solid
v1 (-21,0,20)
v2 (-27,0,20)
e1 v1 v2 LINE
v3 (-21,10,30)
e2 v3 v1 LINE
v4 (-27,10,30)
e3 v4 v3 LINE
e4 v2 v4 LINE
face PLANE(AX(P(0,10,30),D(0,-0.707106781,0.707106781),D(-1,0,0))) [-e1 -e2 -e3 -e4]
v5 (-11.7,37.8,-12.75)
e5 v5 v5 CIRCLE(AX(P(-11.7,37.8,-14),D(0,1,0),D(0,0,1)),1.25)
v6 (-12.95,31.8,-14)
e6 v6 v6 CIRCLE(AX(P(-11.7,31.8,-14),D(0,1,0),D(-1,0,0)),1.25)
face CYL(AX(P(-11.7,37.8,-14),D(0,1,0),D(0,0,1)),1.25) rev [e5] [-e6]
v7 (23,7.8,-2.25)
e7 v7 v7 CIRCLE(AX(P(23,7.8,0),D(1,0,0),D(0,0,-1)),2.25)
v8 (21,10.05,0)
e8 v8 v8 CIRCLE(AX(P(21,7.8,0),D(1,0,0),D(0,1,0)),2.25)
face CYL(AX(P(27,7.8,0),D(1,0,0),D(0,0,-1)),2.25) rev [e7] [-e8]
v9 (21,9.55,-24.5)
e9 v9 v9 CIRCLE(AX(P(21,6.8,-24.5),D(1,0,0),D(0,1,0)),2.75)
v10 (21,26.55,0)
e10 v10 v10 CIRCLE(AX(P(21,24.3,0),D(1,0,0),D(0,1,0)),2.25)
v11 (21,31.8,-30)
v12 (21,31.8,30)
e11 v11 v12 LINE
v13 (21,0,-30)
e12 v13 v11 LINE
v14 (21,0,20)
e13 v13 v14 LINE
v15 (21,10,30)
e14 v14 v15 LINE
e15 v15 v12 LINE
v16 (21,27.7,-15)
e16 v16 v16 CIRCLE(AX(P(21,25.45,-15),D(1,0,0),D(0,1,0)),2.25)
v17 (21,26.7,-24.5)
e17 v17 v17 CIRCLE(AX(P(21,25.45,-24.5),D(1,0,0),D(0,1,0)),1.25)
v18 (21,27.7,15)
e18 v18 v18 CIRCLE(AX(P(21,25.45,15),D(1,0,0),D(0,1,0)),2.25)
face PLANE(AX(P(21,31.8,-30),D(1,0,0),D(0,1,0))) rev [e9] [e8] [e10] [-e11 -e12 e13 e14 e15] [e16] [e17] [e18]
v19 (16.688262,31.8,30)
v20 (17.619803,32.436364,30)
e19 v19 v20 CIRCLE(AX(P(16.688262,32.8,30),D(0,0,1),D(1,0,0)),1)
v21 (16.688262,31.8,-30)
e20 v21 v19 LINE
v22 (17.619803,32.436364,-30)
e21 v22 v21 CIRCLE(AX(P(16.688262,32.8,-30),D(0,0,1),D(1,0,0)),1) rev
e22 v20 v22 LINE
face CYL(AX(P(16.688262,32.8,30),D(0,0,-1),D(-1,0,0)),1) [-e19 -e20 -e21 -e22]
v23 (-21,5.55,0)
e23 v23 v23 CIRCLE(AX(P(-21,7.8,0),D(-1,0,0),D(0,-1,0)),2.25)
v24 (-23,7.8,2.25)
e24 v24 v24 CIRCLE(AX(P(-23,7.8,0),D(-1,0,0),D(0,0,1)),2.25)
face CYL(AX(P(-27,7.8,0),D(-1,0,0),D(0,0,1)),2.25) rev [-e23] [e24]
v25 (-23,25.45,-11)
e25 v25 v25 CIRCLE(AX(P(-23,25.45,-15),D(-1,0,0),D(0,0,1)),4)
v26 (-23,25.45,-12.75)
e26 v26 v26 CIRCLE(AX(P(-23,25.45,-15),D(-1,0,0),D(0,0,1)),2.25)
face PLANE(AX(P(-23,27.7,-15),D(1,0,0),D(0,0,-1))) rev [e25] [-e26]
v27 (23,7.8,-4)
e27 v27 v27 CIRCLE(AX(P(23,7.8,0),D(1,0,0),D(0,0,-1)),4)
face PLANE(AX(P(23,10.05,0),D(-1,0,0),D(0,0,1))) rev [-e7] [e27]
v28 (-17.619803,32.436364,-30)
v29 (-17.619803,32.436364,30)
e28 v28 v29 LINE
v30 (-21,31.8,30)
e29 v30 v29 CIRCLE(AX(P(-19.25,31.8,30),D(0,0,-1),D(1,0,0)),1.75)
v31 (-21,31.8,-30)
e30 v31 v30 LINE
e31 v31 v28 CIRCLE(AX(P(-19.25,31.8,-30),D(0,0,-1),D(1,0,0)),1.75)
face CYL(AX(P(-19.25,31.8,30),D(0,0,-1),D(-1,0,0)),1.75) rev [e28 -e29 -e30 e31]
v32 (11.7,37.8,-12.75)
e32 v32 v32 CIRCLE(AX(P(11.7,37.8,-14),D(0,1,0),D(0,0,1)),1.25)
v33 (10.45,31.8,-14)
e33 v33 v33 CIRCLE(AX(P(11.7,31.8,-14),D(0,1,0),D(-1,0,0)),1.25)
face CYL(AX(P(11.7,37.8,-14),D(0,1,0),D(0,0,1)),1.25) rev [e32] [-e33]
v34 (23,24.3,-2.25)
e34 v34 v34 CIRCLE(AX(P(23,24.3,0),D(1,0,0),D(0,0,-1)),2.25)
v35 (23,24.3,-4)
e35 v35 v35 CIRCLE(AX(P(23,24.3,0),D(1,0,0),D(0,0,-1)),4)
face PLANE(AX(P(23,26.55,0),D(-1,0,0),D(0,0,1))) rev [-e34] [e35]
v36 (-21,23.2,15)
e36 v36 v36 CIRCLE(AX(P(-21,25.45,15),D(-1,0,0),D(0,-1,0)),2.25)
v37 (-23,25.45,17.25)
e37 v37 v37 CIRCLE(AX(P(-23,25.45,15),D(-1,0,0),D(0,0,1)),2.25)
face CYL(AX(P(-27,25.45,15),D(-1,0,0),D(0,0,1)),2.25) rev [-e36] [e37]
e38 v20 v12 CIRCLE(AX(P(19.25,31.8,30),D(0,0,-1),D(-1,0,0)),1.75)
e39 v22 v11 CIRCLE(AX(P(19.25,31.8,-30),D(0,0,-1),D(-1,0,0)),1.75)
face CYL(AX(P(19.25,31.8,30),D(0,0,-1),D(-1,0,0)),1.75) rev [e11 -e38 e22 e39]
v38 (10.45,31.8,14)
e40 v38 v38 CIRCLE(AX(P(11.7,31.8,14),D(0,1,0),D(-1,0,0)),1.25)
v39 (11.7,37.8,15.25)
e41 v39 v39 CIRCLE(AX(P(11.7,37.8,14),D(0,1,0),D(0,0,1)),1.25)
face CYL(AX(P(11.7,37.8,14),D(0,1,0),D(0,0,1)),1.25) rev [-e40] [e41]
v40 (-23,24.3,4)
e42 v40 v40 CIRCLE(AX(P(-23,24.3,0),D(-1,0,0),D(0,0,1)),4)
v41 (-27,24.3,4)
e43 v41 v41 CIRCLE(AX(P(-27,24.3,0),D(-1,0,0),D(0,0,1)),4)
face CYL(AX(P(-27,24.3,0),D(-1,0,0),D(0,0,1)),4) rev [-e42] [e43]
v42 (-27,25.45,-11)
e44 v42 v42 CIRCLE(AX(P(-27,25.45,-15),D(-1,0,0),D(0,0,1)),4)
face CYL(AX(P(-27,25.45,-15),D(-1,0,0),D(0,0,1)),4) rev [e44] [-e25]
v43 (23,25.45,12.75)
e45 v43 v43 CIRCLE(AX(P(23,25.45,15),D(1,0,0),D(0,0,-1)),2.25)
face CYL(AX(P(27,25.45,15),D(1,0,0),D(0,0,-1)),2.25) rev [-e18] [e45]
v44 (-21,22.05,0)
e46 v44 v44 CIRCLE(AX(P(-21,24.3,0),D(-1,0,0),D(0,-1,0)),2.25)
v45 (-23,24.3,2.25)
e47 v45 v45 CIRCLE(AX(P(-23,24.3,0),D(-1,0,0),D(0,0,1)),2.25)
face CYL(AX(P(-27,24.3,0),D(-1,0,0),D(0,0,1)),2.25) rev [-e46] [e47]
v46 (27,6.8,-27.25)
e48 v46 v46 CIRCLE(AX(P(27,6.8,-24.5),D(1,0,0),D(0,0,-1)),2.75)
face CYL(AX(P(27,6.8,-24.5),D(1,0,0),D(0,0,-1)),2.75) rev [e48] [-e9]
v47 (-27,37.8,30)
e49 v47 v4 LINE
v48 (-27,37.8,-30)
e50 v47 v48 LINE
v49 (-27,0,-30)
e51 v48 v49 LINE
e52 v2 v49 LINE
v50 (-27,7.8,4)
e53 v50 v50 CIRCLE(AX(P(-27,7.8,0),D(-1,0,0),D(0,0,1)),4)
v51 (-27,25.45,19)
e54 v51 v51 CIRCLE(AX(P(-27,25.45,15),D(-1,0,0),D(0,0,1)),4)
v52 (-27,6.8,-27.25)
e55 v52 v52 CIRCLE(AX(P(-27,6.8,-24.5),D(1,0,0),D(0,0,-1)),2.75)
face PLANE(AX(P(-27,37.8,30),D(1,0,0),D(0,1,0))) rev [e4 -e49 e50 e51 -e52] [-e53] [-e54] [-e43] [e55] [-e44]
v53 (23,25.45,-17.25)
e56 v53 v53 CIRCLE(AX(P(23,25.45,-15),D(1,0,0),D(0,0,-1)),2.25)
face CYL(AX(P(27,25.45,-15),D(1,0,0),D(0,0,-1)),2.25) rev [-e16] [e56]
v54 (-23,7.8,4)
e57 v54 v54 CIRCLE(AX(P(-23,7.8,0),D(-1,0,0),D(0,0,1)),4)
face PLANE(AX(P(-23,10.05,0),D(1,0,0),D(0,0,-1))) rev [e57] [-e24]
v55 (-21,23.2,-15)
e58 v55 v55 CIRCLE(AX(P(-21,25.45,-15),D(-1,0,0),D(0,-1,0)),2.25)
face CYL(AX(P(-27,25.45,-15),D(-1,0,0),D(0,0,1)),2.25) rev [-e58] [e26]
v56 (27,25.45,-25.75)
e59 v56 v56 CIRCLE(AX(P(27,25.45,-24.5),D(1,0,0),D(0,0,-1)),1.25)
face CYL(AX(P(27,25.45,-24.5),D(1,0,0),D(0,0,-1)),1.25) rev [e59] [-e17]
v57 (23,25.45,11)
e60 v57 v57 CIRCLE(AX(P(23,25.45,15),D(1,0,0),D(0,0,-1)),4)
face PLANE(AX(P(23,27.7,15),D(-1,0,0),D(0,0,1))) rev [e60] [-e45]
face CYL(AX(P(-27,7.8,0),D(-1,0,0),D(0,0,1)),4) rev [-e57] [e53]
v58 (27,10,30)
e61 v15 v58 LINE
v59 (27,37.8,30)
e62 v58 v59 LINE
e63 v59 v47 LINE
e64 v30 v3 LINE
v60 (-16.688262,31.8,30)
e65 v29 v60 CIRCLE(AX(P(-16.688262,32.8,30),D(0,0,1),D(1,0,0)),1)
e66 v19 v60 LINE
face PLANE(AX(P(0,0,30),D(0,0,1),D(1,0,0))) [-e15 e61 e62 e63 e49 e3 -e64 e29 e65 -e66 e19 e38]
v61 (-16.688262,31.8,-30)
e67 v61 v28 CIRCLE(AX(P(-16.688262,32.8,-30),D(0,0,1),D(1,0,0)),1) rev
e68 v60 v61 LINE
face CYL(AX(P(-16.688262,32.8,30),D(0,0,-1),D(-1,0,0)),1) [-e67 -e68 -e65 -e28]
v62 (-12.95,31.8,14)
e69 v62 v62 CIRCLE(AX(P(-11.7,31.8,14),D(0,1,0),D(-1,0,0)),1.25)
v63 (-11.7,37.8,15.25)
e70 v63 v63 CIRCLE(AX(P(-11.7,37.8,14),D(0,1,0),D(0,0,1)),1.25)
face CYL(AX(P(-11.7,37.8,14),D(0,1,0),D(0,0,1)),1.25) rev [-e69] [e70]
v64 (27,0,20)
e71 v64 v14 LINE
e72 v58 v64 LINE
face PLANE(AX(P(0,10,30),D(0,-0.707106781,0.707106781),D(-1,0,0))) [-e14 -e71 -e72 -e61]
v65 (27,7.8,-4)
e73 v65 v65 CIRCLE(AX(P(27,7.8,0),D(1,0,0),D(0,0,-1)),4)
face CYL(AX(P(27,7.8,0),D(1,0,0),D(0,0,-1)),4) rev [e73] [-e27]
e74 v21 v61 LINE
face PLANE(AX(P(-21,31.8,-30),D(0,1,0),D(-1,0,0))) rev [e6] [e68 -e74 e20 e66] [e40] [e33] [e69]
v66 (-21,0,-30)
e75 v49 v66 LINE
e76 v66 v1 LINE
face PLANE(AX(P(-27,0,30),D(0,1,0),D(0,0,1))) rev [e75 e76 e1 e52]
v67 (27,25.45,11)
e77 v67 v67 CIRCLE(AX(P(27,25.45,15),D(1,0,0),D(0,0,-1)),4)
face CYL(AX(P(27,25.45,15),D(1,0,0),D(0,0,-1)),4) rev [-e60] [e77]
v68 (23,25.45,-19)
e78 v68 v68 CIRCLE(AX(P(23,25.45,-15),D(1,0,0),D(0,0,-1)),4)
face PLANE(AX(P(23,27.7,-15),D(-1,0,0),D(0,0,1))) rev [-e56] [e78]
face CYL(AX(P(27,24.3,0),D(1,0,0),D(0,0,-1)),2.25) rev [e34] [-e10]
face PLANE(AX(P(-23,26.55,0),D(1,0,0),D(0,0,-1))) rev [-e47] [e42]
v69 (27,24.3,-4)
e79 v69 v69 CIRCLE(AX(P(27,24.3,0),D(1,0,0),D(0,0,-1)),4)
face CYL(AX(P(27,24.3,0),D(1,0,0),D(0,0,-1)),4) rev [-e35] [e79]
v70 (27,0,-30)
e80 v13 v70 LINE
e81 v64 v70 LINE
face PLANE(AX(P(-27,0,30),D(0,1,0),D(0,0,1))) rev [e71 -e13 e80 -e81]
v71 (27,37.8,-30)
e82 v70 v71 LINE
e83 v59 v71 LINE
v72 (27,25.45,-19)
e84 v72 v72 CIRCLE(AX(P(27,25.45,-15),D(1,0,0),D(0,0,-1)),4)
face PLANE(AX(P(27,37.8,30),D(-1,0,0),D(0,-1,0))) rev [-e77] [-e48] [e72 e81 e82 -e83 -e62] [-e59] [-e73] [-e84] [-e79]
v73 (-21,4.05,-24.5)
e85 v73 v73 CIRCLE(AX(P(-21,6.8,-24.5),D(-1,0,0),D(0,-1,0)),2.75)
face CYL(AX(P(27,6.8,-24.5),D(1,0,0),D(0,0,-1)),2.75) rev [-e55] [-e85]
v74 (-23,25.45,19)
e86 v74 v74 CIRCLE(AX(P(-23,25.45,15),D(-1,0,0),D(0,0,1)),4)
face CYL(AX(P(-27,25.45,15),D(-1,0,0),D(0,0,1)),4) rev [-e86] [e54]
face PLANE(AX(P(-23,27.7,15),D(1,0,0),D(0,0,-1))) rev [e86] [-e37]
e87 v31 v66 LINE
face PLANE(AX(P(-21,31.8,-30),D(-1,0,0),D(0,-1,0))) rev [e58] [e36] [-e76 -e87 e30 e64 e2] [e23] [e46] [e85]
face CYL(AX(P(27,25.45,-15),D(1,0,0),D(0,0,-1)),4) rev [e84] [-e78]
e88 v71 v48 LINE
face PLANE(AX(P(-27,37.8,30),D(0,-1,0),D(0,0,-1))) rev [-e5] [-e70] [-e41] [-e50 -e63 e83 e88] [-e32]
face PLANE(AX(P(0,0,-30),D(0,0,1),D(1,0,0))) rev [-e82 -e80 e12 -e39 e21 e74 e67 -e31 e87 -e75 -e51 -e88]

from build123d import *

# Parameters (mm, degrees)
SKETCH1_W                      = 54
SKETCH1_H                      = 37.8
BOSS_EXTRUDE1_DEPTH            = 30
SKETCH2_W                      = 42
SKETCH2_H                      = 31.8
CUT_EXTRUDE1_DEPTH             = 76.88043226
CBORE_FOR_M4_SHCS1_D           = 4.5
CBORE_FOR_M4_SHCS1_DEPTH       = 6
CBORE_FOR_M4_SHCS1_CBORE_D     = 8
CBORE_FOR_M4_SHCS1_CBORE_DEPTH = 4
M3X0_5_START                   = 31.8
M3X0_5_TAPPED_HOLE_OUTLINE_R   = 1.25
M3X0_5_TAPPED_HOLE_DEPTH       = 6
CHAMFER1_SIZE                  = 10
M5_CLEARANCE_HOLE1_D           = 5.5
M3X0_5_TAPPED_HOLE1_D          = 2.5
M3X0_5_TAPPED_HOLE1_DEPTH      = 6
SKETCH11_R                     = 1.75
CUT_EXTRUDE2_DEPTH             = 76.88043226
FILLET1_R                      = 1


# Read off the part's stored shape, not the designer's step: M3x0.5 Tapped Hole
with BuildPart() as part:
    # Sketch1 → Boss-Extrude1 (new, symmetric)
    with BuildSketch(Plane.XY):
        with Locations((0, 18.9)):
            Rectangle(SKETCH1_W, SKETCH1_H)
    extrude(amount=BOSS_EXTRUDE1_DEPTH, both=True)

    # Sketch2 → Cut-Extrude1 (cut, through all)
    with BuildSketch(Plane.XY.offset(30)):
        with Locations((0, 15.9)):
            Rectangle(SKETCH2_W, SKETCH2_H)
    extrude(amount=-CUT_EXTRUDE1_DEPTH, mode=Mode.SUBTRACT)

    # CBORE for M4 SHCS1
    with Locations(Plane.ZY.offset(27)):
        with Locations((15, 25.45), (0, 24.3), (0, 7.8), (-15, 25.45)):
            cbore_for_m4_shcs1 = CounterBoreHole(CBORE_FOR_M4_SHCS1_D / 2, CBORE_FOR_M4_SHCS1_CBORE_D / 2, CBORE_FOR_M4_SHCS1_CBORE_DEPTH, depth=CBORE_FOR_M4_SHCS1_DEPTH)

    # M3x0.5 Tapped Hole outline → M3x0.5 Tapped Hole (cut)
    with BuildSketch(Plane(origin=(0, 0, 0), x_dir=(1, 0, 0), z_dir=(0, 1, 0)).offset(M3X0_5_START)):
        with Locations((11.7, -14)):
            Circle(M3X0_5_TAPPED_HOLE_OUTLINE_R)
        with Locations((-11.7, 14)):
            Circle(M3X0_5_TAPPED_HOLE_OUTLINE_R)
        with Locations((-11.7, -14)):
            Circle(M3X0_5_TAPPED_HOLE_OUTLINE_R)
        with Locations((11.7, 14)):
            Circle(M3X0_5_TAPPED_HOLE_OUTLINE_R)
    extrude(amount=M3X0_5_TAPPED_HOLE_DEPTH, mode=Mode.SUBTRACT)

    # Chamfer1
    chamfer1_edges = [part.edges().sort_by_distance(p)[0] for p in [
        (24, 0, 30),
        (-24, 0, 30),
    ]]
    chamfer(chamfer1_edges, length=CHAMFER1_SIZE)

    # Mirror1: CBORE for M4 SHCS1 across plane
    add(cbore_for_m4_shcs1.mirror(Plane(origin=(0, 0, 0), x_dir=(0, 0, 1), z_dir=(1, 0, 0))), mode=Mode.SUBTRACT)

    # M5 Clearance Hole1 (through all)
    with Locations(Plane(origin=(27, 0, 0), x_dir=(0, 0, -1), z_dir=(1, 0, 0))):
        with Locations((24.5, 6.8)):
            Hole(M5_CLEARANCE_HOLE1_D / 2)

    # M3x0.5 Tapped Hole1
    with Locations(Plane(origin=(27, 0, 0), x_dir=(0, 0, -1), z_dir=(1, 0, 0))):
        with Locations((24.5, 25.45)):
            Hole(M3X0_5_TAPPED_HOLE1_D / 2, depth=M3X0_5_TAPPED_HOLE1_DEPTH)

    # Sketch11 → Cut-Extrude2 (cut, through all)
    with BuildSketch(Plane(origin=(0, 0, -30), x_dir=(-1, 0, 0), z_dir=(0, 0, -1))):
        with Locations((-19.25, 31.8)):
            Circle(SKETCH11_R)
        with Locations((19.25, 31.8)):
            Circle(SKETCH11_R)
    extrude(amount=-CUT_EXTRUDE2_DEPTH, mode=Mode.SUBTRACT)

    # Fillet1
    fillet1_edges = [part.edges().sort_by_distance(p)[0] for p in [
        (-17.5, 31.8, 0),
        (17.5, 31.8, 0),
    ]]
    fillet(fillet1_edges, radius=FILLET1_R)


solid = part.part
